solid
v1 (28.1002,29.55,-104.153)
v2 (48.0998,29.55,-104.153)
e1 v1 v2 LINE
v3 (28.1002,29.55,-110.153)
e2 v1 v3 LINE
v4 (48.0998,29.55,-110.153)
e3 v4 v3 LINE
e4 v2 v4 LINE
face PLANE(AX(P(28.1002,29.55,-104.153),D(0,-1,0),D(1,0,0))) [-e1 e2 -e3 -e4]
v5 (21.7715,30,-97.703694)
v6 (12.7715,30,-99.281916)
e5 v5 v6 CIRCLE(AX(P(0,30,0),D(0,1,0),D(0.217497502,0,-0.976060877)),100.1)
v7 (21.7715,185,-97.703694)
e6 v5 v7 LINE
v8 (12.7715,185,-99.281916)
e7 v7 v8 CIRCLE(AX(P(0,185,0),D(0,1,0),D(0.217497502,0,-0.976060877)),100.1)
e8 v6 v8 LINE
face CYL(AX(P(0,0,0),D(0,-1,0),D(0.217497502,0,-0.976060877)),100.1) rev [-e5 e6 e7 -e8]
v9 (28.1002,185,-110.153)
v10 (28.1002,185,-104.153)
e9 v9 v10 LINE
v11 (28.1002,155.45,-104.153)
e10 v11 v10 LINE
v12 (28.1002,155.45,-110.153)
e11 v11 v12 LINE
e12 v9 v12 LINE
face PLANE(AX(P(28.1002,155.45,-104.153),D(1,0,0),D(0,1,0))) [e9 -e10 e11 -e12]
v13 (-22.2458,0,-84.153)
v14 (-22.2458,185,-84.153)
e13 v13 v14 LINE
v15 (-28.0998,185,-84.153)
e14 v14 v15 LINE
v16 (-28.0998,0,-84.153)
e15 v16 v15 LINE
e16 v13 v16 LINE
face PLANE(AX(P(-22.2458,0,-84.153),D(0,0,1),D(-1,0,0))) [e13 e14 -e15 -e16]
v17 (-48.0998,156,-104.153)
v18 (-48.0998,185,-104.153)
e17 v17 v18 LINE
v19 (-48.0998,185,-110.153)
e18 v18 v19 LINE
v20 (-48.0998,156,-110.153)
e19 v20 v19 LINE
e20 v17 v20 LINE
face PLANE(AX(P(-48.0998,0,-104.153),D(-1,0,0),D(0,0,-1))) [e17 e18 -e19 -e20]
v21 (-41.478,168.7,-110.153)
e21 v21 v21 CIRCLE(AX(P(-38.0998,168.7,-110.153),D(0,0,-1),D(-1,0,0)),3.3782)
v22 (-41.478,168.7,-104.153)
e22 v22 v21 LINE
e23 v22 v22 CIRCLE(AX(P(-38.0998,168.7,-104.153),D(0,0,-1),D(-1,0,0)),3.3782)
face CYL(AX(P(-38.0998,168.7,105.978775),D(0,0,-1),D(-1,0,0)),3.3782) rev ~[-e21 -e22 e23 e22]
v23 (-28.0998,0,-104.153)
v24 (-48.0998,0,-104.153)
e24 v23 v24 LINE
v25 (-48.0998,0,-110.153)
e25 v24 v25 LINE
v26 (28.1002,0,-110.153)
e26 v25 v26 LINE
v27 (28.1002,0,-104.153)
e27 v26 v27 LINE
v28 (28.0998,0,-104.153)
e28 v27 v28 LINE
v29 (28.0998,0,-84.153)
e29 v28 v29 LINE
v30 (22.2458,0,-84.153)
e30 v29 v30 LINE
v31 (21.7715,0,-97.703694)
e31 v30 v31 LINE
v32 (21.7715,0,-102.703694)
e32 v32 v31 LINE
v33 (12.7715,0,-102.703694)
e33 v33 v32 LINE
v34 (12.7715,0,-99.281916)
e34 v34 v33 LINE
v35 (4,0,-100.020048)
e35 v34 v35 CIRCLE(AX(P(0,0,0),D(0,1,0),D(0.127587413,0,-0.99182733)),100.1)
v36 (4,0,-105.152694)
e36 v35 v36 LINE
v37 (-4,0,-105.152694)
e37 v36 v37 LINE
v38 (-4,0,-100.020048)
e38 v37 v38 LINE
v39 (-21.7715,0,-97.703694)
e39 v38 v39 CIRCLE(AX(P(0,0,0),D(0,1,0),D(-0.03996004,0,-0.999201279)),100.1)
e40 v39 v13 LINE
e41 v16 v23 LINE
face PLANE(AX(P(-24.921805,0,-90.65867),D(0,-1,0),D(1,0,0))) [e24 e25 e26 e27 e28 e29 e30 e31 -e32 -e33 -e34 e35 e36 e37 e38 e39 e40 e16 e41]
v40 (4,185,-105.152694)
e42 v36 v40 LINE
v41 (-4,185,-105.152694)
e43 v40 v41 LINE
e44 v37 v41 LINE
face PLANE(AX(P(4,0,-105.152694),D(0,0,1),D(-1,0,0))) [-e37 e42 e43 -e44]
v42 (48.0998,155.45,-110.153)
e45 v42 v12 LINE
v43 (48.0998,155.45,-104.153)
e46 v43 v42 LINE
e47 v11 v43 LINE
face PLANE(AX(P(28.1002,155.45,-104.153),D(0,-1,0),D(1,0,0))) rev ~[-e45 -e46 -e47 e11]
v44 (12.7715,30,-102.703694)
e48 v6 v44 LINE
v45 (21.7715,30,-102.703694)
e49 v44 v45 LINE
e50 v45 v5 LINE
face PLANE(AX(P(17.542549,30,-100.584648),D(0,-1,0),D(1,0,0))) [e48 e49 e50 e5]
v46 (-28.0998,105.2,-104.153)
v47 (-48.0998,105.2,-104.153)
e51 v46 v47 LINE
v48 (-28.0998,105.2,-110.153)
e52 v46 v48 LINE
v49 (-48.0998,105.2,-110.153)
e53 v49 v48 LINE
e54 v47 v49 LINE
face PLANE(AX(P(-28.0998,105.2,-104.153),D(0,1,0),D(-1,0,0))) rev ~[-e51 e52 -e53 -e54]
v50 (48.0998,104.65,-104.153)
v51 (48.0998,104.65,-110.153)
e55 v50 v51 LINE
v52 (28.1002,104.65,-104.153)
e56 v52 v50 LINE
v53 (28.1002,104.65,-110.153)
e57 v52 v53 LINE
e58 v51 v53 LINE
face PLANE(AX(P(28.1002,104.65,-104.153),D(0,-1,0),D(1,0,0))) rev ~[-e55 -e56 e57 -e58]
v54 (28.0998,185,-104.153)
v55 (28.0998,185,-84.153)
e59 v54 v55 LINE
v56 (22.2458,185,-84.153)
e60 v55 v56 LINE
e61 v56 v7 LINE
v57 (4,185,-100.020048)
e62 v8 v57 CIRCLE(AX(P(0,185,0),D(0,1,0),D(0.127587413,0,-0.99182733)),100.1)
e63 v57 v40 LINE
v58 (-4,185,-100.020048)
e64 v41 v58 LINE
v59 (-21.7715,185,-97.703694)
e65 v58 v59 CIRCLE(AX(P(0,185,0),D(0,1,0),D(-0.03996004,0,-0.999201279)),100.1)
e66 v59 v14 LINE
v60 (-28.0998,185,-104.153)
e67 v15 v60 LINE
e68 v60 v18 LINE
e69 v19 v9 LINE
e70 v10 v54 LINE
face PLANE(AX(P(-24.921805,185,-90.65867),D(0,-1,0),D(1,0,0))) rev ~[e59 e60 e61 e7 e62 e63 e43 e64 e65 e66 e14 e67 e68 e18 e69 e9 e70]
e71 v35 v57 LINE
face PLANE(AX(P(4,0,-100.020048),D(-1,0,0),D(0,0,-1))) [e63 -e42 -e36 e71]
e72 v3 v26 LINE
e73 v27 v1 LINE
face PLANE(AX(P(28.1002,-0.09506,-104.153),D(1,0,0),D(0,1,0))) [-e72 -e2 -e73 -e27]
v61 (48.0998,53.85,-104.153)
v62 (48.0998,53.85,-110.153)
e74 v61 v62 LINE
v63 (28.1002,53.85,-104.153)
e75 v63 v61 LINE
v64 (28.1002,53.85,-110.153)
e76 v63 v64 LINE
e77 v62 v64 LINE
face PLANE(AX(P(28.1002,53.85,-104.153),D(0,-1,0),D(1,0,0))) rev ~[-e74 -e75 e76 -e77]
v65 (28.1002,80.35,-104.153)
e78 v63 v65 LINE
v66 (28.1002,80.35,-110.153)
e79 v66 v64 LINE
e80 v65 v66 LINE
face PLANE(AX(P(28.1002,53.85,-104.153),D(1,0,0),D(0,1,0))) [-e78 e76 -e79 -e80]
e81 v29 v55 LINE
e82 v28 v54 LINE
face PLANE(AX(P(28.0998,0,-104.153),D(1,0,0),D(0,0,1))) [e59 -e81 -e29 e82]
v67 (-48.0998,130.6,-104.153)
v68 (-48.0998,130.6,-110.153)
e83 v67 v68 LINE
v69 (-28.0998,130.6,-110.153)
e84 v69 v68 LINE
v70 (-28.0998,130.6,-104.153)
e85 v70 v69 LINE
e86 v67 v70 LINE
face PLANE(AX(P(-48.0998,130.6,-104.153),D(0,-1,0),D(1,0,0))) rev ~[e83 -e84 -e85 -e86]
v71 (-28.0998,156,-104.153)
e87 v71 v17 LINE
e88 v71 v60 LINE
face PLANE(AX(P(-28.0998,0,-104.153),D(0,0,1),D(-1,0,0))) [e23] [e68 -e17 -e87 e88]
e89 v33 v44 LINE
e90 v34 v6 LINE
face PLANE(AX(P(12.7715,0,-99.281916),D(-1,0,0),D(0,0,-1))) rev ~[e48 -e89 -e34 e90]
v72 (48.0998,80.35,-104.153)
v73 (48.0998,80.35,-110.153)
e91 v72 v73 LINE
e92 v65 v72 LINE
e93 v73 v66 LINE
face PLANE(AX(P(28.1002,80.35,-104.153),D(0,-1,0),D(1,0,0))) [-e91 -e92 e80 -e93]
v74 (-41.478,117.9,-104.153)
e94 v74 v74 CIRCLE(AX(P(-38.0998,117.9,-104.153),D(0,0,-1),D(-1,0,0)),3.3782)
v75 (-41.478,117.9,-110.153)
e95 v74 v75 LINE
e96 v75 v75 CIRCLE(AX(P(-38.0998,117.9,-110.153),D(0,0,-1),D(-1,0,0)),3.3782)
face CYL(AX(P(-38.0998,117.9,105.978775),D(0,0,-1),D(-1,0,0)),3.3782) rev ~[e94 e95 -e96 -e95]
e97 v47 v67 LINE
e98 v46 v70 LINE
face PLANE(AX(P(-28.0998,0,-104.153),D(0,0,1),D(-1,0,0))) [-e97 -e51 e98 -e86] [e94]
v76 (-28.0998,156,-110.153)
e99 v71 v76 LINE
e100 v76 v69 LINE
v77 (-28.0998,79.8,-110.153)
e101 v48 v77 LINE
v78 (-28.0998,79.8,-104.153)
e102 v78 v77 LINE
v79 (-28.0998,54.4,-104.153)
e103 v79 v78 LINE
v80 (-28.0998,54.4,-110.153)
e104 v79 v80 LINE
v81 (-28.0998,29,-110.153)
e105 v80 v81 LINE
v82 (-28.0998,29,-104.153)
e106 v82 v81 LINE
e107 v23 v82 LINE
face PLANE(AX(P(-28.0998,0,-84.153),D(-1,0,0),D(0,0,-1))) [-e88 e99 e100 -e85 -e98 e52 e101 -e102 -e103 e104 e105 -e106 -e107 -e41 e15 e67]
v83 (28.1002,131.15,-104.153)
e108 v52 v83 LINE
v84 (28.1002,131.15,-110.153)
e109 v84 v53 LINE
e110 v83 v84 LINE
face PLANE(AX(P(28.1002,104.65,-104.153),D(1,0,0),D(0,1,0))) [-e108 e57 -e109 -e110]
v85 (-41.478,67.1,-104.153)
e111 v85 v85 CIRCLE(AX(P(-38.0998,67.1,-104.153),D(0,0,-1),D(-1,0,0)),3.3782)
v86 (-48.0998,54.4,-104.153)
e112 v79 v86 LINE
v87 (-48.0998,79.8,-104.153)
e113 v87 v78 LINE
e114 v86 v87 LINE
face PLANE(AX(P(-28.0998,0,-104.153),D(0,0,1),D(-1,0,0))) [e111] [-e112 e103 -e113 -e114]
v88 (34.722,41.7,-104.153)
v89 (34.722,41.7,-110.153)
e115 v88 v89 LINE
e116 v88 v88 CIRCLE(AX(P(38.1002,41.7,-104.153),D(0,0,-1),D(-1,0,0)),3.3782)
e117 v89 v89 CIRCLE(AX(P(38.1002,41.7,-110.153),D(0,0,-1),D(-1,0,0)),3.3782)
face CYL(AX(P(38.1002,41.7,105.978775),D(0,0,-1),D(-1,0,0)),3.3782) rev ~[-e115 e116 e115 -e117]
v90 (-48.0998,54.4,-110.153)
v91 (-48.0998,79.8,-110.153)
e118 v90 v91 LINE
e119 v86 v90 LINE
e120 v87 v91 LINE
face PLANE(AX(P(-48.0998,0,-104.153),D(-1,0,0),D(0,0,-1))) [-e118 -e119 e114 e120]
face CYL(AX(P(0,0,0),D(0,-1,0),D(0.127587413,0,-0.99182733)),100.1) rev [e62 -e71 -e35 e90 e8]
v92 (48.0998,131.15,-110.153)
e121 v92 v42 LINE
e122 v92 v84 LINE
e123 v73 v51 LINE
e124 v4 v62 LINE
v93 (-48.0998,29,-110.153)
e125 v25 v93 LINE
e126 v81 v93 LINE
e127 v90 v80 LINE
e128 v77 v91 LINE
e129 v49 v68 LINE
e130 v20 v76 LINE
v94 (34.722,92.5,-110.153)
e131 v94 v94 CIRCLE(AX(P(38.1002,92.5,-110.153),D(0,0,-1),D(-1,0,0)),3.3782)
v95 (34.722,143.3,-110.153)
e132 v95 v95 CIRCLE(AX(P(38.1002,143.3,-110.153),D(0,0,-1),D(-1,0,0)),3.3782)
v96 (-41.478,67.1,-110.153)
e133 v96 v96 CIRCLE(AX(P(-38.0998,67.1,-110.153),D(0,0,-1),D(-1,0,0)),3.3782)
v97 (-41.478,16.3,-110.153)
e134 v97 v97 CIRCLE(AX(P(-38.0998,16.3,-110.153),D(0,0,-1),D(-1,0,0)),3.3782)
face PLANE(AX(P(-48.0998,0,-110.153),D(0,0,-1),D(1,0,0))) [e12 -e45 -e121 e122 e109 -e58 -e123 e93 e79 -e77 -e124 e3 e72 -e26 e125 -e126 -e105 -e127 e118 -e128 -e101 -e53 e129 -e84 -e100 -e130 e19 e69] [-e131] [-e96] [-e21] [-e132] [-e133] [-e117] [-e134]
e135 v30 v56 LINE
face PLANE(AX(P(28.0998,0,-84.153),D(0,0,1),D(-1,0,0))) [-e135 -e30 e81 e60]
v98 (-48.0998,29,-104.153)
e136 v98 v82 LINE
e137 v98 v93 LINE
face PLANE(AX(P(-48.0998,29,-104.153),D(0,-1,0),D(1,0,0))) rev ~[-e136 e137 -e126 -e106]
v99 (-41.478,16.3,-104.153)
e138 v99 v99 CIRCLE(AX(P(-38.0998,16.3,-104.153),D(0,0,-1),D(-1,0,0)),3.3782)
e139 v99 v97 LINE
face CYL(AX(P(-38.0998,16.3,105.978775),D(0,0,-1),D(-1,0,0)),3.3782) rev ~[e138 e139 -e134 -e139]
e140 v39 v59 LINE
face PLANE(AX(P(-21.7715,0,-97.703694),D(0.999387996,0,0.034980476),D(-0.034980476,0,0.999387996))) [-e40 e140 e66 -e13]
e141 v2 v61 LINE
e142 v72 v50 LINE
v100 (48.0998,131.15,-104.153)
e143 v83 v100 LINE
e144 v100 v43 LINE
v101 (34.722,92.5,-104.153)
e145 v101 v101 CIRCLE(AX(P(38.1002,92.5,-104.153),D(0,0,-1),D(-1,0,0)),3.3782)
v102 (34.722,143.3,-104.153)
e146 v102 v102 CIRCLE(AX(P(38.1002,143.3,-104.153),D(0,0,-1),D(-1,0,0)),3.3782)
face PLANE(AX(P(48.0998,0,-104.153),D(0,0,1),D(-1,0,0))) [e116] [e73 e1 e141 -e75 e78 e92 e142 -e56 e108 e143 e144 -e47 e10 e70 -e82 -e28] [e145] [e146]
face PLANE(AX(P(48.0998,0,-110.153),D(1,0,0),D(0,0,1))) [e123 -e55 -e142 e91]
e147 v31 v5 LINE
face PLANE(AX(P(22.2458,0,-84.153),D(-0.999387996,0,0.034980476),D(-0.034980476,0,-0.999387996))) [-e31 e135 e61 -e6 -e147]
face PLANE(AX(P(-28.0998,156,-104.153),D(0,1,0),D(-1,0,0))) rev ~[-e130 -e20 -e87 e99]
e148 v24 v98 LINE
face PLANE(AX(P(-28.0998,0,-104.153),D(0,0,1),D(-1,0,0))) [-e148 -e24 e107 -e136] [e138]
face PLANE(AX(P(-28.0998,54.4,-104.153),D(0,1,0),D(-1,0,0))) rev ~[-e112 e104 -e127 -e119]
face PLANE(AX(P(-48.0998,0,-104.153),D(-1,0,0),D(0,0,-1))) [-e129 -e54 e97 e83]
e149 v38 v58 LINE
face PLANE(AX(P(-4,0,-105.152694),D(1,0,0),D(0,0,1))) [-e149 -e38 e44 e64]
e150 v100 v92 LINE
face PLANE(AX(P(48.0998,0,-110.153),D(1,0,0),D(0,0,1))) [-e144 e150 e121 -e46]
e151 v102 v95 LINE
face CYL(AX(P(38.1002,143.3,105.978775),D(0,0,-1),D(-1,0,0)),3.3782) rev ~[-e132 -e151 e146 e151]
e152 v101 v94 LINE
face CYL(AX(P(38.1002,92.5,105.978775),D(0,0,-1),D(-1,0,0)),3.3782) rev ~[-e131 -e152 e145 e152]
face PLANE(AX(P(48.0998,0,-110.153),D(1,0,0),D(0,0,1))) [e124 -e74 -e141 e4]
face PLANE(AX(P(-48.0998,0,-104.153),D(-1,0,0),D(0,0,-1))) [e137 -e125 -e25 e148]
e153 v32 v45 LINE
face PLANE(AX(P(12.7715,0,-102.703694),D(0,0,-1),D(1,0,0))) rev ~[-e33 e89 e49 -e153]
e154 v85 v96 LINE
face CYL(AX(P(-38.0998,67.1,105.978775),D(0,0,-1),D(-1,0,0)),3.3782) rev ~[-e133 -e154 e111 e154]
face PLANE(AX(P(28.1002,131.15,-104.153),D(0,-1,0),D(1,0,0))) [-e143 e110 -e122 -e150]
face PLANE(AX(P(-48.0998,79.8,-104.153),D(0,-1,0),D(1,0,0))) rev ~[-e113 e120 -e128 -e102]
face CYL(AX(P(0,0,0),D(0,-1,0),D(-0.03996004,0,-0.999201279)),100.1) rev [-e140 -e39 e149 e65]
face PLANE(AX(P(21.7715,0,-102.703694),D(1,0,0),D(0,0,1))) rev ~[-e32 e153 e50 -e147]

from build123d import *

# Parameters (mm, degrees)
F1_DEPTH = 185
F3_DEPTH = 30
F2_W     = 10
F2_H     = 12.7
F2_W_2   = 20
F2_H_2   = 29.6450595204
F2_H_3   = 26.5
F2_H_4   = 30.8181657076
F4_DEPTH = 25
F5_D     = 6.7564


# Not quite as in the source:
# - a feature names something its author has since deleted; it is built from what else it names


with BuildPart() as f1:
    # F0 (on Front) → F1 (new body)
    with BuildSketch(Plane.XZ):
        with BuildLine():
            Line((-28.0998, -84.153), (-28.0998, -96.0750292217))
            ThreePointArc((-28.0998, -96.0750292217), (-24.948943425, -96.9410141373), (-21.7715, -97.7036938286))
            Line((-21.7715, -97.7036938286), (-22.2458, -84.153))
            Line((-22.2458, -84.153), (-28.0998, -84.153))
        make_face()
        with BuildLine():
            ThreePointArc((-21.7715, -97.7036938286), (-24.948943425, -96.9410141373), (-28.0998, -96.0750292217))
            Line((-28.0998, -96.0750292217), (-28.0998, -104.153))
            Line((-28.0998, -104.153), (-48.0998, -104.153))
            Line((-48.0998, -104.153), (-48.0998, -110.153))
            Line((-48.0998, -110.153), (0, -110.153))
            Line((0, -110.153), (48.0998, -110.153))
            Line((48.0998, -110.153), (48.0998, -104.153))
            Line((48.0998, -104.153), (28.0998, -104.153))
            Line((28.0998, -104.153), (28.0998, -96.0750292217))
            ThreePointArc((28.0998, -96.0750292217), (24.948943425, -96.9410141373), (21.7715, -97.7036938286))
            Line((21.7715, -97.7036938286), (21.7715, -102.7036938286))
            Line((21.7715, -102.7036938286), (12.7715, -102.7036938286))
            Line((12.7715, -102.7036938286), (12.7715, -99.2819157135))
            ThreePointArc((12.7715, -99.2819157135), (8.3938675756, -99.747446018), (4, -100.0200479904))
            Line((4, -100.0200479904), (4, -105.1526938286))
            Line((4, -105.1526938286), (-4, -105.1526938286))
            Line((-4, -105.1526938286), (-4, -100.0200479904))
            ThreePointArc((-4, -100.0200479904), (-12.9376940454, -99.2603952883), (-21.7715, -97.7036938286))
        make_face()
        with BuildLine():
            ThreePointArc((21.7715, -97.7036938286), (24.948943425, -96.9410141373), (28.0998, -96.0750292217))
            Line((28.0998, -96.0750292217), (28.0998, -84.153))
            Line((28.0998, -84.153), (22.2458, -84.153))
            Line((22.2458, -84.153), (21.7715, -97.7036938286))
        make_face()
        with BuildLine():
            Line((21.7715, -102.7036938286), (21.7715, -97.7036938286))
            ThreePointArc((21.7715, -97.7036938286), (17.289517296, -98.5955505673), (12.7715, -99.2819157135))
            Line((12.7715, -99.2819157135), (12.7715, -102.7036938286))
            Line((12.7715, -102.7036938286), (21.7715, -102.7036938286))
        make_face()
    extrude(amount=-F1_DEPTH)

    # F0 (on Front) → F3 (cut)
    with BuildSketch(Plane.XZ):
        with BuildLine():
            Line((21.7715, -102.7036938286), (21.7715, -97.7036938286))
            ThreePointArc((21.7715, -97.7036938286), (17.289517296, -98.5955505673), (12.7715, -99.2819157135))
            Line((12.7715, -99.2819157135), (12.7715, -102.7036938286))
            Line((12.7715, -102.7036938286), (21.7715, -102.7036938286))
        make_face()
    extrude(amount=-F3_DEPTH, mode=Mode.SUBTRACT)

    # F2 (on face) → F4 (cut)
    with BuildSketch(Plane.XY.offset(-104.153)):
        Polygon((-48.0998, 29), (-38.0998, 29), (-38.0998, 41.7), (-38.0998, 54.4), (-48.0998, 54.4), align=None)
        with Locations((-33.0998, 35.35)):
            Rectangle(F2_W, F2_H)
        Polygon((-48.0998, 105.2), (-48.0998, 79.8), (-38.0998, 79.8), (-38.0998, 92.5), (-38.0998, 105.2), align=None)
        with Locations((-33.0998, 86.15)):
            Rectangle(F2_W, F2_H)
        Polygon((-48.0998, 156), (-48.0998, 130.6), (-38.0998, 130.6), (-38.0998, 143.3), (-38.0998, 156), align=None)
        with Locations((-33.0998, 136.95)):
            Rectangle(F2_W, F2_H)
        with Locations((-33.0998, 48.05)):
            Rectangle(F2_W, F2_H)
        with Locations((-33.0998, 98.85)):
            Rectangle(F2_W, F2_H)
        with Locations((-33.0998, 149.65)):
            Rectangle(F2_W, F2_H)
        with Locations((38.1002, 14.7274702398)):
            Rectangle(F2_W_2, F2_H_2)
        with Locations((38.1002, 67.1)):
            Rectangle(F2_W_2, F2_H_3)
        with Locations((38.1002, 117.9)):
            Rectangle(F2_W_2, F2_H_3)
        with Locations((38.1002, 170.8590828538)):
            Rectangle(F2_W_2, F2_H_4)
    extrude(amount=-F4_DEPTH, mode=Mode.SUBTRACT)

    # F5 (through all)
    with Locations(Plane.XY.offset(-104.153)):
        with Locations((-38.0998, 67.1), (-38.0998, 16.3), (-38.0998, 117.9), (-38.0998, 168.7), (38.1002, 92.5), (38.1002, 143.3), (38.1002, 41.7)):
            Hole(F5_D / 2)


solid = f1.part
